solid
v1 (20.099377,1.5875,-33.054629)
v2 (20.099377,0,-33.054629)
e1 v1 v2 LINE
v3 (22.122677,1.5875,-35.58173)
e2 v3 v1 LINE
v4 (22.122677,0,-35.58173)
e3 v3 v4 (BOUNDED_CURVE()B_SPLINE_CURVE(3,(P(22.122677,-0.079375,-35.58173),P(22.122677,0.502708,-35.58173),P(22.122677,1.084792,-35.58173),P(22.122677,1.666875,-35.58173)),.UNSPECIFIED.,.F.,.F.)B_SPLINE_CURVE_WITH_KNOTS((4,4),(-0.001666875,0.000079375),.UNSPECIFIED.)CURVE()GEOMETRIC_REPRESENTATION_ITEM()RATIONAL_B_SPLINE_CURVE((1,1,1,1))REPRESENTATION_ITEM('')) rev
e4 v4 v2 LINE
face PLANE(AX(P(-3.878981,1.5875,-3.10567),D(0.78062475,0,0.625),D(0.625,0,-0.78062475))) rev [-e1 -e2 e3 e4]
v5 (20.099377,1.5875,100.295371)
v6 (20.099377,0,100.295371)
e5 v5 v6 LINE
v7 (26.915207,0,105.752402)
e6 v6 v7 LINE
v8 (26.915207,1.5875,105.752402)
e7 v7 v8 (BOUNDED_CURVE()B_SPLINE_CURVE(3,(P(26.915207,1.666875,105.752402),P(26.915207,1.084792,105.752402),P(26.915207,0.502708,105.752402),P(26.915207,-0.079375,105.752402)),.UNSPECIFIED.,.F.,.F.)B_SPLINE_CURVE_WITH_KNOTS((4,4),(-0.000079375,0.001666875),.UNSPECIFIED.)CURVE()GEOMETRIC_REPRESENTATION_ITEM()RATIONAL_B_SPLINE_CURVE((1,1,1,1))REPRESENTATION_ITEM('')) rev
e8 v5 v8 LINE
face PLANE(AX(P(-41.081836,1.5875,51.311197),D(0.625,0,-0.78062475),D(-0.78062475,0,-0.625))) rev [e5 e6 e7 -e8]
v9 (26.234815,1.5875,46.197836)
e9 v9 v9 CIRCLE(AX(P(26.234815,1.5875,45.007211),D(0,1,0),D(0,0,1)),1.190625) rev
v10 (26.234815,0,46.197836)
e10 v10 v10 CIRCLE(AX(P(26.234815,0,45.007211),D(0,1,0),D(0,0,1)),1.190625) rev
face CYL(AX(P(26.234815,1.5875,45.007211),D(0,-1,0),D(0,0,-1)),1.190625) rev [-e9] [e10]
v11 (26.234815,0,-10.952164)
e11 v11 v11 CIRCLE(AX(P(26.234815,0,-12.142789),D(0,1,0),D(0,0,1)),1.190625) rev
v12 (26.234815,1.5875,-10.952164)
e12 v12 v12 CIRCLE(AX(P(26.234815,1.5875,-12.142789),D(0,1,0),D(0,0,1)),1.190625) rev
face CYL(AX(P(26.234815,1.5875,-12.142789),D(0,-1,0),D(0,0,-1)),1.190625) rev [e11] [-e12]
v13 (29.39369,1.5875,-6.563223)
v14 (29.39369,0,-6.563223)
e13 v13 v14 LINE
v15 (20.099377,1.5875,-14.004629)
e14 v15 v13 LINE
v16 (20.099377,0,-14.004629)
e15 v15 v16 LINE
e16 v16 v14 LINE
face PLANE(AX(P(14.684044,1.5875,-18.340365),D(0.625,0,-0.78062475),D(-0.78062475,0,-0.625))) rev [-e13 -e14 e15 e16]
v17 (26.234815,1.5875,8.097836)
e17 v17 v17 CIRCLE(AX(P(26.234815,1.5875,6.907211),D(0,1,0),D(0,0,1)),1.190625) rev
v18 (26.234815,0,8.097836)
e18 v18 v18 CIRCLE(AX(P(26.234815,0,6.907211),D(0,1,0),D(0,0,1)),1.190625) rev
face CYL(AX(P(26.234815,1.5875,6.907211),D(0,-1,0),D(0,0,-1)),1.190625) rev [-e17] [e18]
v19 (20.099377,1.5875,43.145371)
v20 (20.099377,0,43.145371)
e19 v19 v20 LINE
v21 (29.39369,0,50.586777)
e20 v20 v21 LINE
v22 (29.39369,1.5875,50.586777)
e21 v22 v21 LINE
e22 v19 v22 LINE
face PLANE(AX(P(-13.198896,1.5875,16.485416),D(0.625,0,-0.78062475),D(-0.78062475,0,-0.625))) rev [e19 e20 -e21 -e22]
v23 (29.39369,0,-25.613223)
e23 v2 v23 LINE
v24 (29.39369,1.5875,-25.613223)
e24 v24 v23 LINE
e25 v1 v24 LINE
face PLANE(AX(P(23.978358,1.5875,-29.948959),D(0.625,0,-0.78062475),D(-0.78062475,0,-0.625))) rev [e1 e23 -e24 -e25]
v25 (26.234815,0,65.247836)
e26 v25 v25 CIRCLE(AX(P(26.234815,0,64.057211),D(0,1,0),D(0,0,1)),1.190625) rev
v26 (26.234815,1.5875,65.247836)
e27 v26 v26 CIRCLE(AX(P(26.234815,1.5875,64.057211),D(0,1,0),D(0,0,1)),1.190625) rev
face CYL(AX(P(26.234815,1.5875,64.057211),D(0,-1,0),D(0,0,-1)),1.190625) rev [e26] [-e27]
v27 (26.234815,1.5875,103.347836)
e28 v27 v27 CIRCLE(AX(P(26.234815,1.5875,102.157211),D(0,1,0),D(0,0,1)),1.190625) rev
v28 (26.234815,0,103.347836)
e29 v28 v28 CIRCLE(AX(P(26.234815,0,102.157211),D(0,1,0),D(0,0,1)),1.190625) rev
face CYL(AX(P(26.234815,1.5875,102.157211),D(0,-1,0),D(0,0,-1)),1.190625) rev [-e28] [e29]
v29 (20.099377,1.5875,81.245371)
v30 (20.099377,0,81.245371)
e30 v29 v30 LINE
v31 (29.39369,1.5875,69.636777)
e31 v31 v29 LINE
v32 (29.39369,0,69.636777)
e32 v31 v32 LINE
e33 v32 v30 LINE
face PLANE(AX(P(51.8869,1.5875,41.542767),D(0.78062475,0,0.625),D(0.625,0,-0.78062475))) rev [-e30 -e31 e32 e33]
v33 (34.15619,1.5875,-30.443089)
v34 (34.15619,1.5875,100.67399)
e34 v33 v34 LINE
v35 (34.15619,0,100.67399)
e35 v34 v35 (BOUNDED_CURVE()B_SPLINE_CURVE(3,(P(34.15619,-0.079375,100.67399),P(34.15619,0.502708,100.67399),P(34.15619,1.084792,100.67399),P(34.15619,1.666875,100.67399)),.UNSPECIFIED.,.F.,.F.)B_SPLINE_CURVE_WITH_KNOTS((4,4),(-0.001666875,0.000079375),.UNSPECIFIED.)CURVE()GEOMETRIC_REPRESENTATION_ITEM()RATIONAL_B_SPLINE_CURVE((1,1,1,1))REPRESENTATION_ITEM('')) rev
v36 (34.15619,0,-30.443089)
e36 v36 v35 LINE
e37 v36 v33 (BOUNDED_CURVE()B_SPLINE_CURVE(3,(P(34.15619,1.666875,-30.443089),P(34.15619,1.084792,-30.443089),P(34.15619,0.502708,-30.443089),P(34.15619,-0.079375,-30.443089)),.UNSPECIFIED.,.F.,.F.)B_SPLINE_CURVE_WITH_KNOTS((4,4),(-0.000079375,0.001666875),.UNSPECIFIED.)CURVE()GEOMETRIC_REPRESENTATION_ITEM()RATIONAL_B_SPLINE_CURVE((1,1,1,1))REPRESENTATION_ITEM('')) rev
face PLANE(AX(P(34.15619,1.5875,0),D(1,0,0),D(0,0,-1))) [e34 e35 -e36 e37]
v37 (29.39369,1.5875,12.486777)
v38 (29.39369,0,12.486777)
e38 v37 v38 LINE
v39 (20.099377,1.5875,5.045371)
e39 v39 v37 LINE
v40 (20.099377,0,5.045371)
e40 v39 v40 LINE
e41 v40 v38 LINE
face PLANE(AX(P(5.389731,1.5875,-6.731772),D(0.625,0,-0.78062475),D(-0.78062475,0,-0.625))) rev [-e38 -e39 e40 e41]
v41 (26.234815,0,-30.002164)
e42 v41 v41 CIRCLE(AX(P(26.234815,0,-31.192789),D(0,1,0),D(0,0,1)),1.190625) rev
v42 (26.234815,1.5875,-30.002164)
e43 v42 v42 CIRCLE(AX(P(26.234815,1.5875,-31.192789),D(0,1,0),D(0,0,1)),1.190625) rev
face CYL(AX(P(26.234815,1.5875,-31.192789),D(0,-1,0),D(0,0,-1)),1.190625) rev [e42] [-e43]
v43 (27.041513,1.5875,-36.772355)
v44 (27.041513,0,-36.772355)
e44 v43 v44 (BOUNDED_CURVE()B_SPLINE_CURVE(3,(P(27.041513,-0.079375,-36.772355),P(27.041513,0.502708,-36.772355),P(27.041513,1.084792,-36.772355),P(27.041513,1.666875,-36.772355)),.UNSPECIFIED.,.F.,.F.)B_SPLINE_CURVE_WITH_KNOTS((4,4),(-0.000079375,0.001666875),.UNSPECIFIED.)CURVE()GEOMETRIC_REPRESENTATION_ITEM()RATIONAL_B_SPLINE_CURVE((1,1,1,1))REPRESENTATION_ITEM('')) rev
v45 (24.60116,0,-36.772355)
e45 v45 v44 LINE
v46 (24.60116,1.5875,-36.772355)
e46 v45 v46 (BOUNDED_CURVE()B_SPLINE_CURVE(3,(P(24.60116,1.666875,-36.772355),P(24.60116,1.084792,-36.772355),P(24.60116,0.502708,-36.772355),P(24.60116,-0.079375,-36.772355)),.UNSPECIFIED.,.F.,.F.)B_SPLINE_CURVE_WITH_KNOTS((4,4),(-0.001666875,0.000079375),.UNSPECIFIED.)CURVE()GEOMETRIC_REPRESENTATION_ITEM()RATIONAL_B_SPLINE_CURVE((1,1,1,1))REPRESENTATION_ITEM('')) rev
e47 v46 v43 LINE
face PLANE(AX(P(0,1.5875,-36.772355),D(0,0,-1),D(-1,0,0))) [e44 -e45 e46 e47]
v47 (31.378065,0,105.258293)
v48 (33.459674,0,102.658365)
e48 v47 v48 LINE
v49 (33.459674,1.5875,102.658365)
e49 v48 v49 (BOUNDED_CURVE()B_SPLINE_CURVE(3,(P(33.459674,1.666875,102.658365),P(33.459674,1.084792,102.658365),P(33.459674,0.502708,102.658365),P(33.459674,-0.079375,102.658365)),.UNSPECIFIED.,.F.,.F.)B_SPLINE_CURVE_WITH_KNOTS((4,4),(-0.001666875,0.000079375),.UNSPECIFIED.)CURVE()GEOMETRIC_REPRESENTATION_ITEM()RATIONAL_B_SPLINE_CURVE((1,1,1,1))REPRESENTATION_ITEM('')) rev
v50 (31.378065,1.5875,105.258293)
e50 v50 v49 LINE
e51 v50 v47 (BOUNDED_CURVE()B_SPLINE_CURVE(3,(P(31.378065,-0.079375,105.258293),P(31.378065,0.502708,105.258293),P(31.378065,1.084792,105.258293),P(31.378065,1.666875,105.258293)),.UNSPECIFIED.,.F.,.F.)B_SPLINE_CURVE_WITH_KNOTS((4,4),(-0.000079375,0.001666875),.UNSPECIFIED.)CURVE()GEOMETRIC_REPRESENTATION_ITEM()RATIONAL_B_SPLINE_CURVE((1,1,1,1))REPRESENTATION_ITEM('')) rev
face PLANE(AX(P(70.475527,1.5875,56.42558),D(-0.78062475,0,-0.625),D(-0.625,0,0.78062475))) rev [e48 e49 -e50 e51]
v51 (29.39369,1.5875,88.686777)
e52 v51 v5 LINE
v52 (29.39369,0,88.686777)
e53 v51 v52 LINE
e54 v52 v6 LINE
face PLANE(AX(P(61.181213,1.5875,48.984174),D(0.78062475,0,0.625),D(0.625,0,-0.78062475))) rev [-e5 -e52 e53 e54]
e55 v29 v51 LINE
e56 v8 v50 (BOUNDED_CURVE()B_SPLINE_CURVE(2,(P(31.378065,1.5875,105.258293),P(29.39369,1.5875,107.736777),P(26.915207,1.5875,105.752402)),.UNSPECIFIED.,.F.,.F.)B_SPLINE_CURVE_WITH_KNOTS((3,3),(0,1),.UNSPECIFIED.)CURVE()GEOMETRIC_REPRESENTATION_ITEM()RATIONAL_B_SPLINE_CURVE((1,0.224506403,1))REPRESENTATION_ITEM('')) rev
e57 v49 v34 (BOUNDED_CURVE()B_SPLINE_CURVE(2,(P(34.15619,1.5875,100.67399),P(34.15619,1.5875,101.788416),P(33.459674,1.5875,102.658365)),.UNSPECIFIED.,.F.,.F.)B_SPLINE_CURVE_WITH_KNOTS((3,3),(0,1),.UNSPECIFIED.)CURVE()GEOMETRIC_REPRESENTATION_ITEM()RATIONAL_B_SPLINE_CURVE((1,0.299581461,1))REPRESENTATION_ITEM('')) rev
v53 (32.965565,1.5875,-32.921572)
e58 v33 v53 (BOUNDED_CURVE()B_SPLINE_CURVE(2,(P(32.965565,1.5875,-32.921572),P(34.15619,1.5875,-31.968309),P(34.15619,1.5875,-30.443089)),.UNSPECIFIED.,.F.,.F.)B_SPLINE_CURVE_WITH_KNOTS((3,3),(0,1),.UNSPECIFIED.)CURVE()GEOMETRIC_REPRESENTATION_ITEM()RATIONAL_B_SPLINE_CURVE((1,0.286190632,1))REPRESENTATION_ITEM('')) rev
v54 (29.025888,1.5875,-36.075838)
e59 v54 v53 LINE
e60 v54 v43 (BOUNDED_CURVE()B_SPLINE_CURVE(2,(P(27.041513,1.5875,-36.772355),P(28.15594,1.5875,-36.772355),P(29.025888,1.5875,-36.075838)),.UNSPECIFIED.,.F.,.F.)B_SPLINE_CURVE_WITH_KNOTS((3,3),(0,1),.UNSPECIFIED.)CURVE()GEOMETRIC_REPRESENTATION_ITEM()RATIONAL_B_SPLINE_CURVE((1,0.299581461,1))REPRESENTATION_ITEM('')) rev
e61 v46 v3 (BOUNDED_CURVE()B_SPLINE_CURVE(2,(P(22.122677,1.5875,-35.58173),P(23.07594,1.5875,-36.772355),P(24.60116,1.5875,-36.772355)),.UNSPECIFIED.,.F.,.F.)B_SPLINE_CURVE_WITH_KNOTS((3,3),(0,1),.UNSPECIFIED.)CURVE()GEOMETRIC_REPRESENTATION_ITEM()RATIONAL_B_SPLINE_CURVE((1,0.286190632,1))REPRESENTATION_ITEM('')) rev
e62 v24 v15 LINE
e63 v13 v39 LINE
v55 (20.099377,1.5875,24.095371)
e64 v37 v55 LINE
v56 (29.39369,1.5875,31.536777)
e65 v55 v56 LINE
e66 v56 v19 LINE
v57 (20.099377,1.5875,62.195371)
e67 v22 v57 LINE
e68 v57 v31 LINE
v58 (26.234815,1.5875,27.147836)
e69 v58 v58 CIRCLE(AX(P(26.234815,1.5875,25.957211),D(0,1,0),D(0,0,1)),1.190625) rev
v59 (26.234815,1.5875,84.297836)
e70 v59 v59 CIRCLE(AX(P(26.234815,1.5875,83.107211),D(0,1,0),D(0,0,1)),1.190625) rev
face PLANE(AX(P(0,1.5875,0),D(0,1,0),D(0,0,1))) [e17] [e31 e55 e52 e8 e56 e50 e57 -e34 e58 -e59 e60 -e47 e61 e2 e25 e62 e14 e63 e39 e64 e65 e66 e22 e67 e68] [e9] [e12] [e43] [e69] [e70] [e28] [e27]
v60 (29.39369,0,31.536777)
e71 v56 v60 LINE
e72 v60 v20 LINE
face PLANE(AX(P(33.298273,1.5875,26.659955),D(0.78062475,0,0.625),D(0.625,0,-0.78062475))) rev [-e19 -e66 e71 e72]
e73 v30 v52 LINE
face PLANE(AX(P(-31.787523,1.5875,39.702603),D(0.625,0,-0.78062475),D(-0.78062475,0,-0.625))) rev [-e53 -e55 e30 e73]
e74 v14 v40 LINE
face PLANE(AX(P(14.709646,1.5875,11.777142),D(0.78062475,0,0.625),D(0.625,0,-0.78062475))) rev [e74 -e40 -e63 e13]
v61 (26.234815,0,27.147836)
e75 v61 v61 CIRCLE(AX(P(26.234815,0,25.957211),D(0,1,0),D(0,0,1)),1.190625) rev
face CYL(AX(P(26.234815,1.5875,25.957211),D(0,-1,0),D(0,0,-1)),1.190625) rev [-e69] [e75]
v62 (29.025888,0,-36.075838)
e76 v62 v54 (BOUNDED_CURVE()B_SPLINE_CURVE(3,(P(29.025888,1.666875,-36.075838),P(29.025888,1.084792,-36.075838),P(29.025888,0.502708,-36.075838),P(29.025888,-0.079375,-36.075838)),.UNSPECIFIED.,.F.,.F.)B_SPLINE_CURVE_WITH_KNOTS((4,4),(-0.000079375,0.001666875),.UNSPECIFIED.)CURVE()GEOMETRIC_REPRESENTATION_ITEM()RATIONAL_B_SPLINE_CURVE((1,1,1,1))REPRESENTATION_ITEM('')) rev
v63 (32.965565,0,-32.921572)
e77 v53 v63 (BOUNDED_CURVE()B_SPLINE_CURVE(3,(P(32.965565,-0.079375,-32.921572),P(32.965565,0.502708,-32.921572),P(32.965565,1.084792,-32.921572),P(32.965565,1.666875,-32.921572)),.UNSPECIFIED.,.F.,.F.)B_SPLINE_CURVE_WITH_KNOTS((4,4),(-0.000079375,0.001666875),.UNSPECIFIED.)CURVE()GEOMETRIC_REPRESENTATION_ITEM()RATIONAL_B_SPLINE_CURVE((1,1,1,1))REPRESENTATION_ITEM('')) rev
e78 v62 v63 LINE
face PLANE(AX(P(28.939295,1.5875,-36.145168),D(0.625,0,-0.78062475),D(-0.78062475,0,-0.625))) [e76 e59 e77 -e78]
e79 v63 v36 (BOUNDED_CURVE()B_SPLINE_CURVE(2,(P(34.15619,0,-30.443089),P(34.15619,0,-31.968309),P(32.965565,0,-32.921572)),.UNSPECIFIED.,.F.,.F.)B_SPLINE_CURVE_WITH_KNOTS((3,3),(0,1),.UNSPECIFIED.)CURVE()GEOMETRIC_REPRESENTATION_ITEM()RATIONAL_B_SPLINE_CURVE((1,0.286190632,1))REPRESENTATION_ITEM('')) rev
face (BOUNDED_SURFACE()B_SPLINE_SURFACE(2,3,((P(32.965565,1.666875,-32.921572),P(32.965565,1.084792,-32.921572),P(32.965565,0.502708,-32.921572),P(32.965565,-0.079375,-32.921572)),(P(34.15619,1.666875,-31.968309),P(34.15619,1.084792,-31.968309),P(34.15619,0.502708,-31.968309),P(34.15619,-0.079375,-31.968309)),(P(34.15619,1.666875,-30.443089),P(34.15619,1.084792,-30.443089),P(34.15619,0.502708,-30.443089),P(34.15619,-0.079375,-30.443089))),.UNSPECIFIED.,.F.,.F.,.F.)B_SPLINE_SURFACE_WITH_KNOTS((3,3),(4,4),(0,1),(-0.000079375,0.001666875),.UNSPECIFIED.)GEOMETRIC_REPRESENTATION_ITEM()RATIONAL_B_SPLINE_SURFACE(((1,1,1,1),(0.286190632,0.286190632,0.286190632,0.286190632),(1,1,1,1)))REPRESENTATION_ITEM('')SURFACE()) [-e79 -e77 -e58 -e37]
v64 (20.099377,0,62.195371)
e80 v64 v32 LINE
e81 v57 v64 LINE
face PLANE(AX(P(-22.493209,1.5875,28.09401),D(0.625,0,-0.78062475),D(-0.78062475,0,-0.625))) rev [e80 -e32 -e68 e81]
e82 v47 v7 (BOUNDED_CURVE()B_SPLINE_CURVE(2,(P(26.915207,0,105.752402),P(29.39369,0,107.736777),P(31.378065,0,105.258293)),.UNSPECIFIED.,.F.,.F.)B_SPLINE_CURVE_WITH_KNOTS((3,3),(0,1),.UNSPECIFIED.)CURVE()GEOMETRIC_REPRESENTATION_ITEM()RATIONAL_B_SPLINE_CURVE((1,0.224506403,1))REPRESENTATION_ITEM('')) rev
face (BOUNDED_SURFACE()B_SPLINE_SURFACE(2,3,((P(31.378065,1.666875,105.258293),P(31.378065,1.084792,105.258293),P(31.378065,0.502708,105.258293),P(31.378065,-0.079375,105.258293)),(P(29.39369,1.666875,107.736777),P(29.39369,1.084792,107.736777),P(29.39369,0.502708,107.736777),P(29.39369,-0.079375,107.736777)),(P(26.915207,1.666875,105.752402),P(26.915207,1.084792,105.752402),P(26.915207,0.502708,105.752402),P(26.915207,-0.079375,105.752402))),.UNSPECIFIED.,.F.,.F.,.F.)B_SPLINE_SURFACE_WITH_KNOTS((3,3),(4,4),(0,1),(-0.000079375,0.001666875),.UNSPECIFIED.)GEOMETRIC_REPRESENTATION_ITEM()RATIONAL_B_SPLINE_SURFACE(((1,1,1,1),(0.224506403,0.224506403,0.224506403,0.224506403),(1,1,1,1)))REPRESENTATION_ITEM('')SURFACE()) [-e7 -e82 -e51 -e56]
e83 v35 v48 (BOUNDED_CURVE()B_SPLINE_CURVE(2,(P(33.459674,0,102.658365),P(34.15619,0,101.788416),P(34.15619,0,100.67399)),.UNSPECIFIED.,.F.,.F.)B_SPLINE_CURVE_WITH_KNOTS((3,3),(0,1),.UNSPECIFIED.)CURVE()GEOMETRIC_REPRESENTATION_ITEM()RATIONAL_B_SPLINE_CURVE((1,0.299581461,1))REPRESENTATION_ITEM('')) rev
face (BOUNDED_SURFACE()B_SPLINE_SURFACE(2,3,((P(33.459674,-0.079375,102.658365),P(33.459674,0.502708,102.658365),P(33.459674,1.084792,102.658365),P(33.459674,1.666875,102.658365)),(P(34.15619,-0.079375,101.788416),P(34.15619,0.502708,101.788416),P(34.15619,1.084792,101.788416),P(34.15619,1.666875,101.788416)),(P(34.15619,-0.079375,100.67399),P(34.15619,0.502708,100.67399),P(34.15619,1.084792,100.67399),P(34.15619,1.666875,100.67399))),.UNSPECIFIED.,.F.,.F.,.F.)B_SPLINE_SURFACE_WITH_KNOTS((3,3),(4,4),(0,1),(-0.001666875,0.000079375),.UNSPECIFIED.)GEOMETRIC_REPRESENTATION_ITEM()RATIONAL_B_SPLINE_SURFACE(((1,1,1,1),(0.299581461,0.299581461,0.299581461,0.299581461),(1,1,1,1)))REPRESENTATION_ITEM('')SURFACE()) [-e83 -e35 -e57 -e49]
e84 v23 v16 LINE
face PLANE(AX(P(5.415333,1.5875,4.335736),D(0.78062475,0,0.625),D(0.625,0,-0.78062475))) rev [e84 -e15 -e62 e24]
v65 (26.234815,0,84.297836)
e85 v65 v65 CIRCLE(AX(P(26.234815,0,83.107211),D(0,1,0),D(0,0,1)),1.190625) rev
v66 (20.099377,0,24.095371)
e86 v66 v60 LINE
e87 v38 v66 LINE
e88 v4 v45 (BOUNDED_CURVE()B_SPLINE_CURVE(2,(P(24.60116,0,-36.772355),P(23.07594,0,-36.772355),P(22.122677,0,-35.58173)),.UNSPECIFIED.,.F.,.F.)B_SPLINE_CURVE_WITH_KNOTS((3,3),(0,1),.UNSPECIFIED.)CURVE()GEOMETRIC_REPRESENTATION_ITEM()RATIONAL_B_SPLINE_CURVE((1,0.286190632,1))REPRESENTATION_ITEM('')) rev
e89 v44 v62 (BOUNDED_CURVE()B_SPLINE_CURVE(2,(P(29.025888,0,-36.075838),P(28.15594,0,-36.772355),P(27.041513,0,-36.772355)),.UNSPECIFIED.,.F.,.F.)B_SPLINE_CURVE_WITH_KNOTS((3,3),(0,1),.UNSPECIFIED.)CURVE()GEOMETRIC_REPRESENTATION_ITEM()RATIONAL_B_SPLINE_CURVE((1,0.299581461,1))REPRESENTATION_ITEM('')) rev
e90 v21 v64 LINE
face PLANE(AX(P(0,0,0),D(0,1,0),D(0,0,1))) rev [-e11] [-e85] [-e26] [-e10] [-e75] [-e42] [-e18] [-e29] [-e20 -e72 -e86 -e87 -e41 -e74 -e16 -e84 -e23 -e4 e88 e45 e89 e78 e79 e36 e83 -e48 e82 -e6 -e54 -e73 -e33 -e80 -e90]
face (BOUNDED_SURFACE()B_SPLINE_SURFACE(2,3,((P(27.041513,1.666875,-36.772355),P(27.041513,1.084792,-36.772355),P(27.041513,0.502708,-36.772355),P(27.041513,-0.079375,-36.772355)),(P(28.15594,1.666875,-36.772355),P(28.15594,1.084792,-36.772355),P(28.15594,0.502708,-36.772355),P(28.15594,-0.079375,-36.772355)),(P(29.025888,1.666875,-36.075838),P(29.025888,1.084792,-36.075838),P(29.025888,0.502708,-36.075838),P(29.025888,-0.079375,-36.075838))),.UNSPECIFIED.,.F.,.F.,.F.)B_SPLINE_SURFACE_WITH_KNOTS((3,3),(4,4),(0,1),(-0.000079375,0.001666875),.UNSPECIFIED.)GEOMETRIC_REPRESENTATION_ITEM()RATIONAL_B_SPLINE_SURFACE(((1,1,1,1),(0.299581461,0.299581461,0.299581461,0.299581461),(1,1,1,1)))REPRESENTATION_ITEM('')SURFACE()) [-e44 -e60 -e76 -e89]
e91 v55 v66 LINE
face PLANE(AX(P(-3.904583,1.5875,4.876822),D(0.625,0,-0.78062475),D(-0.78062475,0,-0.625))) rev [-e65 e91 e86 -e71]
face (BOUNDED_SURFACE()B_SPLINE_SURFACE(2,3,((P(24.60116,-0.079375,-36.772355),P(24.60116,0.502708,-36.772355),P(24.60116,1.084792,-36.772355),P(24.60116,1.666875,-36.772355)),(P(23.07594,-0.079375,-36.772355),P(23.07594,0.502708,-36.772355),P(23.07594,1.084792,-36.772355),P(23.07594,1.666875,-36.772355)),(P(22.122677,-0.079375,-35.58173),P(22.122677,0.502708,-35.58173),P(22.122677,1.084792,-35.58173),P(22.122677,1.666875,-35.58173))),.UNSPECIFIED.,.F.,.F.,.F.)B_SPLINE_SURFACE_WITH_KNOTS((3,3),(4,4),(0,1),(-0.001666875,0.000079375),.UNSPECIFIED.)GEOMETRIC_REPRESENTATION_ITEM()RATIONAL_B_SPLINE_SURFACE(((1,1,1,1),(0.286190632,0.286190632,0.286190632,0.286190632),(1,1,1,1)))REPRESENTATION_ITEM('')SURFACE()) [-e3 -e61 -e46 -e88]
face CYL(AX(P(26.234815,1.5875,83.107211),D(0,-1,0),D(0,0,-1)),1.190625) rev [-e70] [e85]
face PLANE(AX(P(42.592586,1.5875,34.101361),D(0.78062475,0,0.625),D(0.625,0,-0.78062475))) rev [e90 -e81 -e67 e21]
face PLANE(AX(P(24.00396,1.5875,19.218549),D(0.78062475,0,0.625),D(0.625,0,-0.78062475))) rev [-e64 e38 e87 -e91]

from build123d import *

# Parameters (mm, degrees)
SKETCH2_R           = 1.190625
BOSS_EXTRUDE1_DEPTH = 1.5875
FILLET1_SIZE        = 3.175


with BuildPart() as part:
    # Sketch2 → Boss-Extrude1 (new body)
    with BuildSketch(Plane(origin=(0, 0, 0), x_dir=(1, 0, 0), z_dir=(0, 1, 0))):
        Polygon((29.393690453, -107.736776908), (34.156190453, -101.788416314), (34.156190453, 31.968309197), (28.155939525, 36.772354713), (23.075939525, 36.772354713), (20.099377025, 33.054629342), (29.393690453, 25.613223092), (20.099377025, 14.004629342), (24.746533739, 10.283926217), (29.393690453, 6.563223092), (20.099377025, -5.045370658), (29.393690453, -12.486776908), (20.099377025, -24.095370658), (29.393690453, -31.536776908), (20.099377025, -43.145370658), (29.393690453, -50.586776908), (20.099377025, -62.195370658), (29.393690453, -69.636776908), (20.099377025, -81.245370658), (29.393690453, -88.686776908), (20.099377025, -100.295370658), align=None)
        with Locations(Location((26.234814989, -102.157211097, 0), (0, 0, 270))):
            Circle(SKETCH2_R, mode=Mode.SUBTRACT)
        with Locations(Location((26.234814989, -83.107211097, 0), (0, 0, 270))):
            Circle(SKETCH2_R, mode=Mode.SUBTRACT)
        with Locations(Location((26.234814989, -64.057211097, 0), (0, 0, 270))):
            Circle(SKETCH2_R, mode=Mode.SUBTRACT)
        with Locations(Location((26.234814989, -45.007211097, 0), (0, 0, 270))):
            Circle(SKETCH2_R, mode=Mode.SUBTRACT)
        with Locations(Location((26.234814989, -25.957211097, 0), (0, 0, 270))):
            Circle(SKETCH2_R, mode=Mode.SUBTRACT)
        with Locations(Location((26.234814989, -6.907211097, 0), (0, 0, 270))):
            Circle(SKETCH2_R, mode=Mode.SUBTRACT)
        with BuildLine():
            ThreePointArc((27.425439989, 12.142788903), (26.750370737, 11.069574031), (25.490674364, 11.21335756))
            ThreePointArc((25.490674364, 11.21335756), (25.719259241, 13.216003775), (27.425439989, 12.142788903))
        make_face(mode=Mode.SUBTRACT)
        with Locations(Location((26.234814989, 31.192788903, 0), (0, 0, 270))):
            Circle(SKETCH2_R, mode=Mode.SUBTRACT)
    extrude(amount=BOSS_EXTRUDE1_DEPTH)

    # Fillet1
    # a fillet whose section is not a circle: 3.175 mm, written as the material it takes off along each edge
    with BuildSketch(Plane(origin=(29.393690453, -7.9375, 107.736776908), x_dir=(0.6249999999921612, 0, -0.7806247498060759), z_dir=(0, 1, 0))) as fillet1_piece_1:
        with BuildLine():
            Bezier((FILLET1_SIZE, 0), (0, 0), (0, FILLET1_SIZE), weights=[1, 0.224506403, 1])
            Line((0, FILLET1_SIZE), (0, 0))
            Line((0, 0), (FILLET1_SIZE, 0))
        make_face()
    extrude(amount=17.4625, mode=Mode.SUBTRACT)
    with BuildSketch(Plane(origin=(34.156190453, -2.786065678, 101.788416314), x_dir=(-0.6250000000189532, 0, 0.7806247497846253), z_dir=(0, 1, 0))) as fillet1_piece_2:
        with BuildLine():
            Bezier((1.114426271, 0), (0, 0), (-0.869948729, -0.696516419), weights=[1, 0.299581461, 1])
            Line((-0.869948729, -0.696516419), (0, 0))
            Line((0, 0), (1.114426271, 0))
        make_face()
    extrude(amount=7.159631356, mode=Mode.SUBTRACT)
    with BuildSketch(Plane(origin=(34.156190453, -3.813051663, -31.968309197), x_dir=(-0.7806247498123451, 0, -0.624999999984331), z_dir=(0, 1, 0)), Plane(origin=(23.075939525, -3.813051662, -36.772354713), x_dir=(-0.6250000000000002, 0, 0.7806247497997996), z_dir=(0, 1, 0))) as fillet1_piece_3:
        with BuildLine():
            Bezier((1.525220665, 0), (0, 0), (-0.953262916, 1.190625), weights=[1, 0.286190632, 1])
            Line((-0.953262916, 1.190625), (0, 0))
            Line((0, 0), (1.525220665, 0))
        make_face()
    extrude(amount=9.213603325, mode=Mode.SUBTRACT)
    with BuildSketch(Plane(origin=(28.155939525, -2.786065678, -36.772354713), x_dir=(-1, 0, 0), z_dir=(0, 1, 0))) as fillet1_piece_4:
        with BuildLine():
            Bezier((1.114426271, 0), (0, 0), (-0.869948729, 0.696516419), weights=[1, 0.299581461, 1])
            Line((-0.869948729, 0.696516419), (0, 0))
            Line((0, 0), (1.114426271, 0))
        make_face()
    extrude(amount=7.159631355, mode=Mode.SUBTRACT)


solid = part.part
